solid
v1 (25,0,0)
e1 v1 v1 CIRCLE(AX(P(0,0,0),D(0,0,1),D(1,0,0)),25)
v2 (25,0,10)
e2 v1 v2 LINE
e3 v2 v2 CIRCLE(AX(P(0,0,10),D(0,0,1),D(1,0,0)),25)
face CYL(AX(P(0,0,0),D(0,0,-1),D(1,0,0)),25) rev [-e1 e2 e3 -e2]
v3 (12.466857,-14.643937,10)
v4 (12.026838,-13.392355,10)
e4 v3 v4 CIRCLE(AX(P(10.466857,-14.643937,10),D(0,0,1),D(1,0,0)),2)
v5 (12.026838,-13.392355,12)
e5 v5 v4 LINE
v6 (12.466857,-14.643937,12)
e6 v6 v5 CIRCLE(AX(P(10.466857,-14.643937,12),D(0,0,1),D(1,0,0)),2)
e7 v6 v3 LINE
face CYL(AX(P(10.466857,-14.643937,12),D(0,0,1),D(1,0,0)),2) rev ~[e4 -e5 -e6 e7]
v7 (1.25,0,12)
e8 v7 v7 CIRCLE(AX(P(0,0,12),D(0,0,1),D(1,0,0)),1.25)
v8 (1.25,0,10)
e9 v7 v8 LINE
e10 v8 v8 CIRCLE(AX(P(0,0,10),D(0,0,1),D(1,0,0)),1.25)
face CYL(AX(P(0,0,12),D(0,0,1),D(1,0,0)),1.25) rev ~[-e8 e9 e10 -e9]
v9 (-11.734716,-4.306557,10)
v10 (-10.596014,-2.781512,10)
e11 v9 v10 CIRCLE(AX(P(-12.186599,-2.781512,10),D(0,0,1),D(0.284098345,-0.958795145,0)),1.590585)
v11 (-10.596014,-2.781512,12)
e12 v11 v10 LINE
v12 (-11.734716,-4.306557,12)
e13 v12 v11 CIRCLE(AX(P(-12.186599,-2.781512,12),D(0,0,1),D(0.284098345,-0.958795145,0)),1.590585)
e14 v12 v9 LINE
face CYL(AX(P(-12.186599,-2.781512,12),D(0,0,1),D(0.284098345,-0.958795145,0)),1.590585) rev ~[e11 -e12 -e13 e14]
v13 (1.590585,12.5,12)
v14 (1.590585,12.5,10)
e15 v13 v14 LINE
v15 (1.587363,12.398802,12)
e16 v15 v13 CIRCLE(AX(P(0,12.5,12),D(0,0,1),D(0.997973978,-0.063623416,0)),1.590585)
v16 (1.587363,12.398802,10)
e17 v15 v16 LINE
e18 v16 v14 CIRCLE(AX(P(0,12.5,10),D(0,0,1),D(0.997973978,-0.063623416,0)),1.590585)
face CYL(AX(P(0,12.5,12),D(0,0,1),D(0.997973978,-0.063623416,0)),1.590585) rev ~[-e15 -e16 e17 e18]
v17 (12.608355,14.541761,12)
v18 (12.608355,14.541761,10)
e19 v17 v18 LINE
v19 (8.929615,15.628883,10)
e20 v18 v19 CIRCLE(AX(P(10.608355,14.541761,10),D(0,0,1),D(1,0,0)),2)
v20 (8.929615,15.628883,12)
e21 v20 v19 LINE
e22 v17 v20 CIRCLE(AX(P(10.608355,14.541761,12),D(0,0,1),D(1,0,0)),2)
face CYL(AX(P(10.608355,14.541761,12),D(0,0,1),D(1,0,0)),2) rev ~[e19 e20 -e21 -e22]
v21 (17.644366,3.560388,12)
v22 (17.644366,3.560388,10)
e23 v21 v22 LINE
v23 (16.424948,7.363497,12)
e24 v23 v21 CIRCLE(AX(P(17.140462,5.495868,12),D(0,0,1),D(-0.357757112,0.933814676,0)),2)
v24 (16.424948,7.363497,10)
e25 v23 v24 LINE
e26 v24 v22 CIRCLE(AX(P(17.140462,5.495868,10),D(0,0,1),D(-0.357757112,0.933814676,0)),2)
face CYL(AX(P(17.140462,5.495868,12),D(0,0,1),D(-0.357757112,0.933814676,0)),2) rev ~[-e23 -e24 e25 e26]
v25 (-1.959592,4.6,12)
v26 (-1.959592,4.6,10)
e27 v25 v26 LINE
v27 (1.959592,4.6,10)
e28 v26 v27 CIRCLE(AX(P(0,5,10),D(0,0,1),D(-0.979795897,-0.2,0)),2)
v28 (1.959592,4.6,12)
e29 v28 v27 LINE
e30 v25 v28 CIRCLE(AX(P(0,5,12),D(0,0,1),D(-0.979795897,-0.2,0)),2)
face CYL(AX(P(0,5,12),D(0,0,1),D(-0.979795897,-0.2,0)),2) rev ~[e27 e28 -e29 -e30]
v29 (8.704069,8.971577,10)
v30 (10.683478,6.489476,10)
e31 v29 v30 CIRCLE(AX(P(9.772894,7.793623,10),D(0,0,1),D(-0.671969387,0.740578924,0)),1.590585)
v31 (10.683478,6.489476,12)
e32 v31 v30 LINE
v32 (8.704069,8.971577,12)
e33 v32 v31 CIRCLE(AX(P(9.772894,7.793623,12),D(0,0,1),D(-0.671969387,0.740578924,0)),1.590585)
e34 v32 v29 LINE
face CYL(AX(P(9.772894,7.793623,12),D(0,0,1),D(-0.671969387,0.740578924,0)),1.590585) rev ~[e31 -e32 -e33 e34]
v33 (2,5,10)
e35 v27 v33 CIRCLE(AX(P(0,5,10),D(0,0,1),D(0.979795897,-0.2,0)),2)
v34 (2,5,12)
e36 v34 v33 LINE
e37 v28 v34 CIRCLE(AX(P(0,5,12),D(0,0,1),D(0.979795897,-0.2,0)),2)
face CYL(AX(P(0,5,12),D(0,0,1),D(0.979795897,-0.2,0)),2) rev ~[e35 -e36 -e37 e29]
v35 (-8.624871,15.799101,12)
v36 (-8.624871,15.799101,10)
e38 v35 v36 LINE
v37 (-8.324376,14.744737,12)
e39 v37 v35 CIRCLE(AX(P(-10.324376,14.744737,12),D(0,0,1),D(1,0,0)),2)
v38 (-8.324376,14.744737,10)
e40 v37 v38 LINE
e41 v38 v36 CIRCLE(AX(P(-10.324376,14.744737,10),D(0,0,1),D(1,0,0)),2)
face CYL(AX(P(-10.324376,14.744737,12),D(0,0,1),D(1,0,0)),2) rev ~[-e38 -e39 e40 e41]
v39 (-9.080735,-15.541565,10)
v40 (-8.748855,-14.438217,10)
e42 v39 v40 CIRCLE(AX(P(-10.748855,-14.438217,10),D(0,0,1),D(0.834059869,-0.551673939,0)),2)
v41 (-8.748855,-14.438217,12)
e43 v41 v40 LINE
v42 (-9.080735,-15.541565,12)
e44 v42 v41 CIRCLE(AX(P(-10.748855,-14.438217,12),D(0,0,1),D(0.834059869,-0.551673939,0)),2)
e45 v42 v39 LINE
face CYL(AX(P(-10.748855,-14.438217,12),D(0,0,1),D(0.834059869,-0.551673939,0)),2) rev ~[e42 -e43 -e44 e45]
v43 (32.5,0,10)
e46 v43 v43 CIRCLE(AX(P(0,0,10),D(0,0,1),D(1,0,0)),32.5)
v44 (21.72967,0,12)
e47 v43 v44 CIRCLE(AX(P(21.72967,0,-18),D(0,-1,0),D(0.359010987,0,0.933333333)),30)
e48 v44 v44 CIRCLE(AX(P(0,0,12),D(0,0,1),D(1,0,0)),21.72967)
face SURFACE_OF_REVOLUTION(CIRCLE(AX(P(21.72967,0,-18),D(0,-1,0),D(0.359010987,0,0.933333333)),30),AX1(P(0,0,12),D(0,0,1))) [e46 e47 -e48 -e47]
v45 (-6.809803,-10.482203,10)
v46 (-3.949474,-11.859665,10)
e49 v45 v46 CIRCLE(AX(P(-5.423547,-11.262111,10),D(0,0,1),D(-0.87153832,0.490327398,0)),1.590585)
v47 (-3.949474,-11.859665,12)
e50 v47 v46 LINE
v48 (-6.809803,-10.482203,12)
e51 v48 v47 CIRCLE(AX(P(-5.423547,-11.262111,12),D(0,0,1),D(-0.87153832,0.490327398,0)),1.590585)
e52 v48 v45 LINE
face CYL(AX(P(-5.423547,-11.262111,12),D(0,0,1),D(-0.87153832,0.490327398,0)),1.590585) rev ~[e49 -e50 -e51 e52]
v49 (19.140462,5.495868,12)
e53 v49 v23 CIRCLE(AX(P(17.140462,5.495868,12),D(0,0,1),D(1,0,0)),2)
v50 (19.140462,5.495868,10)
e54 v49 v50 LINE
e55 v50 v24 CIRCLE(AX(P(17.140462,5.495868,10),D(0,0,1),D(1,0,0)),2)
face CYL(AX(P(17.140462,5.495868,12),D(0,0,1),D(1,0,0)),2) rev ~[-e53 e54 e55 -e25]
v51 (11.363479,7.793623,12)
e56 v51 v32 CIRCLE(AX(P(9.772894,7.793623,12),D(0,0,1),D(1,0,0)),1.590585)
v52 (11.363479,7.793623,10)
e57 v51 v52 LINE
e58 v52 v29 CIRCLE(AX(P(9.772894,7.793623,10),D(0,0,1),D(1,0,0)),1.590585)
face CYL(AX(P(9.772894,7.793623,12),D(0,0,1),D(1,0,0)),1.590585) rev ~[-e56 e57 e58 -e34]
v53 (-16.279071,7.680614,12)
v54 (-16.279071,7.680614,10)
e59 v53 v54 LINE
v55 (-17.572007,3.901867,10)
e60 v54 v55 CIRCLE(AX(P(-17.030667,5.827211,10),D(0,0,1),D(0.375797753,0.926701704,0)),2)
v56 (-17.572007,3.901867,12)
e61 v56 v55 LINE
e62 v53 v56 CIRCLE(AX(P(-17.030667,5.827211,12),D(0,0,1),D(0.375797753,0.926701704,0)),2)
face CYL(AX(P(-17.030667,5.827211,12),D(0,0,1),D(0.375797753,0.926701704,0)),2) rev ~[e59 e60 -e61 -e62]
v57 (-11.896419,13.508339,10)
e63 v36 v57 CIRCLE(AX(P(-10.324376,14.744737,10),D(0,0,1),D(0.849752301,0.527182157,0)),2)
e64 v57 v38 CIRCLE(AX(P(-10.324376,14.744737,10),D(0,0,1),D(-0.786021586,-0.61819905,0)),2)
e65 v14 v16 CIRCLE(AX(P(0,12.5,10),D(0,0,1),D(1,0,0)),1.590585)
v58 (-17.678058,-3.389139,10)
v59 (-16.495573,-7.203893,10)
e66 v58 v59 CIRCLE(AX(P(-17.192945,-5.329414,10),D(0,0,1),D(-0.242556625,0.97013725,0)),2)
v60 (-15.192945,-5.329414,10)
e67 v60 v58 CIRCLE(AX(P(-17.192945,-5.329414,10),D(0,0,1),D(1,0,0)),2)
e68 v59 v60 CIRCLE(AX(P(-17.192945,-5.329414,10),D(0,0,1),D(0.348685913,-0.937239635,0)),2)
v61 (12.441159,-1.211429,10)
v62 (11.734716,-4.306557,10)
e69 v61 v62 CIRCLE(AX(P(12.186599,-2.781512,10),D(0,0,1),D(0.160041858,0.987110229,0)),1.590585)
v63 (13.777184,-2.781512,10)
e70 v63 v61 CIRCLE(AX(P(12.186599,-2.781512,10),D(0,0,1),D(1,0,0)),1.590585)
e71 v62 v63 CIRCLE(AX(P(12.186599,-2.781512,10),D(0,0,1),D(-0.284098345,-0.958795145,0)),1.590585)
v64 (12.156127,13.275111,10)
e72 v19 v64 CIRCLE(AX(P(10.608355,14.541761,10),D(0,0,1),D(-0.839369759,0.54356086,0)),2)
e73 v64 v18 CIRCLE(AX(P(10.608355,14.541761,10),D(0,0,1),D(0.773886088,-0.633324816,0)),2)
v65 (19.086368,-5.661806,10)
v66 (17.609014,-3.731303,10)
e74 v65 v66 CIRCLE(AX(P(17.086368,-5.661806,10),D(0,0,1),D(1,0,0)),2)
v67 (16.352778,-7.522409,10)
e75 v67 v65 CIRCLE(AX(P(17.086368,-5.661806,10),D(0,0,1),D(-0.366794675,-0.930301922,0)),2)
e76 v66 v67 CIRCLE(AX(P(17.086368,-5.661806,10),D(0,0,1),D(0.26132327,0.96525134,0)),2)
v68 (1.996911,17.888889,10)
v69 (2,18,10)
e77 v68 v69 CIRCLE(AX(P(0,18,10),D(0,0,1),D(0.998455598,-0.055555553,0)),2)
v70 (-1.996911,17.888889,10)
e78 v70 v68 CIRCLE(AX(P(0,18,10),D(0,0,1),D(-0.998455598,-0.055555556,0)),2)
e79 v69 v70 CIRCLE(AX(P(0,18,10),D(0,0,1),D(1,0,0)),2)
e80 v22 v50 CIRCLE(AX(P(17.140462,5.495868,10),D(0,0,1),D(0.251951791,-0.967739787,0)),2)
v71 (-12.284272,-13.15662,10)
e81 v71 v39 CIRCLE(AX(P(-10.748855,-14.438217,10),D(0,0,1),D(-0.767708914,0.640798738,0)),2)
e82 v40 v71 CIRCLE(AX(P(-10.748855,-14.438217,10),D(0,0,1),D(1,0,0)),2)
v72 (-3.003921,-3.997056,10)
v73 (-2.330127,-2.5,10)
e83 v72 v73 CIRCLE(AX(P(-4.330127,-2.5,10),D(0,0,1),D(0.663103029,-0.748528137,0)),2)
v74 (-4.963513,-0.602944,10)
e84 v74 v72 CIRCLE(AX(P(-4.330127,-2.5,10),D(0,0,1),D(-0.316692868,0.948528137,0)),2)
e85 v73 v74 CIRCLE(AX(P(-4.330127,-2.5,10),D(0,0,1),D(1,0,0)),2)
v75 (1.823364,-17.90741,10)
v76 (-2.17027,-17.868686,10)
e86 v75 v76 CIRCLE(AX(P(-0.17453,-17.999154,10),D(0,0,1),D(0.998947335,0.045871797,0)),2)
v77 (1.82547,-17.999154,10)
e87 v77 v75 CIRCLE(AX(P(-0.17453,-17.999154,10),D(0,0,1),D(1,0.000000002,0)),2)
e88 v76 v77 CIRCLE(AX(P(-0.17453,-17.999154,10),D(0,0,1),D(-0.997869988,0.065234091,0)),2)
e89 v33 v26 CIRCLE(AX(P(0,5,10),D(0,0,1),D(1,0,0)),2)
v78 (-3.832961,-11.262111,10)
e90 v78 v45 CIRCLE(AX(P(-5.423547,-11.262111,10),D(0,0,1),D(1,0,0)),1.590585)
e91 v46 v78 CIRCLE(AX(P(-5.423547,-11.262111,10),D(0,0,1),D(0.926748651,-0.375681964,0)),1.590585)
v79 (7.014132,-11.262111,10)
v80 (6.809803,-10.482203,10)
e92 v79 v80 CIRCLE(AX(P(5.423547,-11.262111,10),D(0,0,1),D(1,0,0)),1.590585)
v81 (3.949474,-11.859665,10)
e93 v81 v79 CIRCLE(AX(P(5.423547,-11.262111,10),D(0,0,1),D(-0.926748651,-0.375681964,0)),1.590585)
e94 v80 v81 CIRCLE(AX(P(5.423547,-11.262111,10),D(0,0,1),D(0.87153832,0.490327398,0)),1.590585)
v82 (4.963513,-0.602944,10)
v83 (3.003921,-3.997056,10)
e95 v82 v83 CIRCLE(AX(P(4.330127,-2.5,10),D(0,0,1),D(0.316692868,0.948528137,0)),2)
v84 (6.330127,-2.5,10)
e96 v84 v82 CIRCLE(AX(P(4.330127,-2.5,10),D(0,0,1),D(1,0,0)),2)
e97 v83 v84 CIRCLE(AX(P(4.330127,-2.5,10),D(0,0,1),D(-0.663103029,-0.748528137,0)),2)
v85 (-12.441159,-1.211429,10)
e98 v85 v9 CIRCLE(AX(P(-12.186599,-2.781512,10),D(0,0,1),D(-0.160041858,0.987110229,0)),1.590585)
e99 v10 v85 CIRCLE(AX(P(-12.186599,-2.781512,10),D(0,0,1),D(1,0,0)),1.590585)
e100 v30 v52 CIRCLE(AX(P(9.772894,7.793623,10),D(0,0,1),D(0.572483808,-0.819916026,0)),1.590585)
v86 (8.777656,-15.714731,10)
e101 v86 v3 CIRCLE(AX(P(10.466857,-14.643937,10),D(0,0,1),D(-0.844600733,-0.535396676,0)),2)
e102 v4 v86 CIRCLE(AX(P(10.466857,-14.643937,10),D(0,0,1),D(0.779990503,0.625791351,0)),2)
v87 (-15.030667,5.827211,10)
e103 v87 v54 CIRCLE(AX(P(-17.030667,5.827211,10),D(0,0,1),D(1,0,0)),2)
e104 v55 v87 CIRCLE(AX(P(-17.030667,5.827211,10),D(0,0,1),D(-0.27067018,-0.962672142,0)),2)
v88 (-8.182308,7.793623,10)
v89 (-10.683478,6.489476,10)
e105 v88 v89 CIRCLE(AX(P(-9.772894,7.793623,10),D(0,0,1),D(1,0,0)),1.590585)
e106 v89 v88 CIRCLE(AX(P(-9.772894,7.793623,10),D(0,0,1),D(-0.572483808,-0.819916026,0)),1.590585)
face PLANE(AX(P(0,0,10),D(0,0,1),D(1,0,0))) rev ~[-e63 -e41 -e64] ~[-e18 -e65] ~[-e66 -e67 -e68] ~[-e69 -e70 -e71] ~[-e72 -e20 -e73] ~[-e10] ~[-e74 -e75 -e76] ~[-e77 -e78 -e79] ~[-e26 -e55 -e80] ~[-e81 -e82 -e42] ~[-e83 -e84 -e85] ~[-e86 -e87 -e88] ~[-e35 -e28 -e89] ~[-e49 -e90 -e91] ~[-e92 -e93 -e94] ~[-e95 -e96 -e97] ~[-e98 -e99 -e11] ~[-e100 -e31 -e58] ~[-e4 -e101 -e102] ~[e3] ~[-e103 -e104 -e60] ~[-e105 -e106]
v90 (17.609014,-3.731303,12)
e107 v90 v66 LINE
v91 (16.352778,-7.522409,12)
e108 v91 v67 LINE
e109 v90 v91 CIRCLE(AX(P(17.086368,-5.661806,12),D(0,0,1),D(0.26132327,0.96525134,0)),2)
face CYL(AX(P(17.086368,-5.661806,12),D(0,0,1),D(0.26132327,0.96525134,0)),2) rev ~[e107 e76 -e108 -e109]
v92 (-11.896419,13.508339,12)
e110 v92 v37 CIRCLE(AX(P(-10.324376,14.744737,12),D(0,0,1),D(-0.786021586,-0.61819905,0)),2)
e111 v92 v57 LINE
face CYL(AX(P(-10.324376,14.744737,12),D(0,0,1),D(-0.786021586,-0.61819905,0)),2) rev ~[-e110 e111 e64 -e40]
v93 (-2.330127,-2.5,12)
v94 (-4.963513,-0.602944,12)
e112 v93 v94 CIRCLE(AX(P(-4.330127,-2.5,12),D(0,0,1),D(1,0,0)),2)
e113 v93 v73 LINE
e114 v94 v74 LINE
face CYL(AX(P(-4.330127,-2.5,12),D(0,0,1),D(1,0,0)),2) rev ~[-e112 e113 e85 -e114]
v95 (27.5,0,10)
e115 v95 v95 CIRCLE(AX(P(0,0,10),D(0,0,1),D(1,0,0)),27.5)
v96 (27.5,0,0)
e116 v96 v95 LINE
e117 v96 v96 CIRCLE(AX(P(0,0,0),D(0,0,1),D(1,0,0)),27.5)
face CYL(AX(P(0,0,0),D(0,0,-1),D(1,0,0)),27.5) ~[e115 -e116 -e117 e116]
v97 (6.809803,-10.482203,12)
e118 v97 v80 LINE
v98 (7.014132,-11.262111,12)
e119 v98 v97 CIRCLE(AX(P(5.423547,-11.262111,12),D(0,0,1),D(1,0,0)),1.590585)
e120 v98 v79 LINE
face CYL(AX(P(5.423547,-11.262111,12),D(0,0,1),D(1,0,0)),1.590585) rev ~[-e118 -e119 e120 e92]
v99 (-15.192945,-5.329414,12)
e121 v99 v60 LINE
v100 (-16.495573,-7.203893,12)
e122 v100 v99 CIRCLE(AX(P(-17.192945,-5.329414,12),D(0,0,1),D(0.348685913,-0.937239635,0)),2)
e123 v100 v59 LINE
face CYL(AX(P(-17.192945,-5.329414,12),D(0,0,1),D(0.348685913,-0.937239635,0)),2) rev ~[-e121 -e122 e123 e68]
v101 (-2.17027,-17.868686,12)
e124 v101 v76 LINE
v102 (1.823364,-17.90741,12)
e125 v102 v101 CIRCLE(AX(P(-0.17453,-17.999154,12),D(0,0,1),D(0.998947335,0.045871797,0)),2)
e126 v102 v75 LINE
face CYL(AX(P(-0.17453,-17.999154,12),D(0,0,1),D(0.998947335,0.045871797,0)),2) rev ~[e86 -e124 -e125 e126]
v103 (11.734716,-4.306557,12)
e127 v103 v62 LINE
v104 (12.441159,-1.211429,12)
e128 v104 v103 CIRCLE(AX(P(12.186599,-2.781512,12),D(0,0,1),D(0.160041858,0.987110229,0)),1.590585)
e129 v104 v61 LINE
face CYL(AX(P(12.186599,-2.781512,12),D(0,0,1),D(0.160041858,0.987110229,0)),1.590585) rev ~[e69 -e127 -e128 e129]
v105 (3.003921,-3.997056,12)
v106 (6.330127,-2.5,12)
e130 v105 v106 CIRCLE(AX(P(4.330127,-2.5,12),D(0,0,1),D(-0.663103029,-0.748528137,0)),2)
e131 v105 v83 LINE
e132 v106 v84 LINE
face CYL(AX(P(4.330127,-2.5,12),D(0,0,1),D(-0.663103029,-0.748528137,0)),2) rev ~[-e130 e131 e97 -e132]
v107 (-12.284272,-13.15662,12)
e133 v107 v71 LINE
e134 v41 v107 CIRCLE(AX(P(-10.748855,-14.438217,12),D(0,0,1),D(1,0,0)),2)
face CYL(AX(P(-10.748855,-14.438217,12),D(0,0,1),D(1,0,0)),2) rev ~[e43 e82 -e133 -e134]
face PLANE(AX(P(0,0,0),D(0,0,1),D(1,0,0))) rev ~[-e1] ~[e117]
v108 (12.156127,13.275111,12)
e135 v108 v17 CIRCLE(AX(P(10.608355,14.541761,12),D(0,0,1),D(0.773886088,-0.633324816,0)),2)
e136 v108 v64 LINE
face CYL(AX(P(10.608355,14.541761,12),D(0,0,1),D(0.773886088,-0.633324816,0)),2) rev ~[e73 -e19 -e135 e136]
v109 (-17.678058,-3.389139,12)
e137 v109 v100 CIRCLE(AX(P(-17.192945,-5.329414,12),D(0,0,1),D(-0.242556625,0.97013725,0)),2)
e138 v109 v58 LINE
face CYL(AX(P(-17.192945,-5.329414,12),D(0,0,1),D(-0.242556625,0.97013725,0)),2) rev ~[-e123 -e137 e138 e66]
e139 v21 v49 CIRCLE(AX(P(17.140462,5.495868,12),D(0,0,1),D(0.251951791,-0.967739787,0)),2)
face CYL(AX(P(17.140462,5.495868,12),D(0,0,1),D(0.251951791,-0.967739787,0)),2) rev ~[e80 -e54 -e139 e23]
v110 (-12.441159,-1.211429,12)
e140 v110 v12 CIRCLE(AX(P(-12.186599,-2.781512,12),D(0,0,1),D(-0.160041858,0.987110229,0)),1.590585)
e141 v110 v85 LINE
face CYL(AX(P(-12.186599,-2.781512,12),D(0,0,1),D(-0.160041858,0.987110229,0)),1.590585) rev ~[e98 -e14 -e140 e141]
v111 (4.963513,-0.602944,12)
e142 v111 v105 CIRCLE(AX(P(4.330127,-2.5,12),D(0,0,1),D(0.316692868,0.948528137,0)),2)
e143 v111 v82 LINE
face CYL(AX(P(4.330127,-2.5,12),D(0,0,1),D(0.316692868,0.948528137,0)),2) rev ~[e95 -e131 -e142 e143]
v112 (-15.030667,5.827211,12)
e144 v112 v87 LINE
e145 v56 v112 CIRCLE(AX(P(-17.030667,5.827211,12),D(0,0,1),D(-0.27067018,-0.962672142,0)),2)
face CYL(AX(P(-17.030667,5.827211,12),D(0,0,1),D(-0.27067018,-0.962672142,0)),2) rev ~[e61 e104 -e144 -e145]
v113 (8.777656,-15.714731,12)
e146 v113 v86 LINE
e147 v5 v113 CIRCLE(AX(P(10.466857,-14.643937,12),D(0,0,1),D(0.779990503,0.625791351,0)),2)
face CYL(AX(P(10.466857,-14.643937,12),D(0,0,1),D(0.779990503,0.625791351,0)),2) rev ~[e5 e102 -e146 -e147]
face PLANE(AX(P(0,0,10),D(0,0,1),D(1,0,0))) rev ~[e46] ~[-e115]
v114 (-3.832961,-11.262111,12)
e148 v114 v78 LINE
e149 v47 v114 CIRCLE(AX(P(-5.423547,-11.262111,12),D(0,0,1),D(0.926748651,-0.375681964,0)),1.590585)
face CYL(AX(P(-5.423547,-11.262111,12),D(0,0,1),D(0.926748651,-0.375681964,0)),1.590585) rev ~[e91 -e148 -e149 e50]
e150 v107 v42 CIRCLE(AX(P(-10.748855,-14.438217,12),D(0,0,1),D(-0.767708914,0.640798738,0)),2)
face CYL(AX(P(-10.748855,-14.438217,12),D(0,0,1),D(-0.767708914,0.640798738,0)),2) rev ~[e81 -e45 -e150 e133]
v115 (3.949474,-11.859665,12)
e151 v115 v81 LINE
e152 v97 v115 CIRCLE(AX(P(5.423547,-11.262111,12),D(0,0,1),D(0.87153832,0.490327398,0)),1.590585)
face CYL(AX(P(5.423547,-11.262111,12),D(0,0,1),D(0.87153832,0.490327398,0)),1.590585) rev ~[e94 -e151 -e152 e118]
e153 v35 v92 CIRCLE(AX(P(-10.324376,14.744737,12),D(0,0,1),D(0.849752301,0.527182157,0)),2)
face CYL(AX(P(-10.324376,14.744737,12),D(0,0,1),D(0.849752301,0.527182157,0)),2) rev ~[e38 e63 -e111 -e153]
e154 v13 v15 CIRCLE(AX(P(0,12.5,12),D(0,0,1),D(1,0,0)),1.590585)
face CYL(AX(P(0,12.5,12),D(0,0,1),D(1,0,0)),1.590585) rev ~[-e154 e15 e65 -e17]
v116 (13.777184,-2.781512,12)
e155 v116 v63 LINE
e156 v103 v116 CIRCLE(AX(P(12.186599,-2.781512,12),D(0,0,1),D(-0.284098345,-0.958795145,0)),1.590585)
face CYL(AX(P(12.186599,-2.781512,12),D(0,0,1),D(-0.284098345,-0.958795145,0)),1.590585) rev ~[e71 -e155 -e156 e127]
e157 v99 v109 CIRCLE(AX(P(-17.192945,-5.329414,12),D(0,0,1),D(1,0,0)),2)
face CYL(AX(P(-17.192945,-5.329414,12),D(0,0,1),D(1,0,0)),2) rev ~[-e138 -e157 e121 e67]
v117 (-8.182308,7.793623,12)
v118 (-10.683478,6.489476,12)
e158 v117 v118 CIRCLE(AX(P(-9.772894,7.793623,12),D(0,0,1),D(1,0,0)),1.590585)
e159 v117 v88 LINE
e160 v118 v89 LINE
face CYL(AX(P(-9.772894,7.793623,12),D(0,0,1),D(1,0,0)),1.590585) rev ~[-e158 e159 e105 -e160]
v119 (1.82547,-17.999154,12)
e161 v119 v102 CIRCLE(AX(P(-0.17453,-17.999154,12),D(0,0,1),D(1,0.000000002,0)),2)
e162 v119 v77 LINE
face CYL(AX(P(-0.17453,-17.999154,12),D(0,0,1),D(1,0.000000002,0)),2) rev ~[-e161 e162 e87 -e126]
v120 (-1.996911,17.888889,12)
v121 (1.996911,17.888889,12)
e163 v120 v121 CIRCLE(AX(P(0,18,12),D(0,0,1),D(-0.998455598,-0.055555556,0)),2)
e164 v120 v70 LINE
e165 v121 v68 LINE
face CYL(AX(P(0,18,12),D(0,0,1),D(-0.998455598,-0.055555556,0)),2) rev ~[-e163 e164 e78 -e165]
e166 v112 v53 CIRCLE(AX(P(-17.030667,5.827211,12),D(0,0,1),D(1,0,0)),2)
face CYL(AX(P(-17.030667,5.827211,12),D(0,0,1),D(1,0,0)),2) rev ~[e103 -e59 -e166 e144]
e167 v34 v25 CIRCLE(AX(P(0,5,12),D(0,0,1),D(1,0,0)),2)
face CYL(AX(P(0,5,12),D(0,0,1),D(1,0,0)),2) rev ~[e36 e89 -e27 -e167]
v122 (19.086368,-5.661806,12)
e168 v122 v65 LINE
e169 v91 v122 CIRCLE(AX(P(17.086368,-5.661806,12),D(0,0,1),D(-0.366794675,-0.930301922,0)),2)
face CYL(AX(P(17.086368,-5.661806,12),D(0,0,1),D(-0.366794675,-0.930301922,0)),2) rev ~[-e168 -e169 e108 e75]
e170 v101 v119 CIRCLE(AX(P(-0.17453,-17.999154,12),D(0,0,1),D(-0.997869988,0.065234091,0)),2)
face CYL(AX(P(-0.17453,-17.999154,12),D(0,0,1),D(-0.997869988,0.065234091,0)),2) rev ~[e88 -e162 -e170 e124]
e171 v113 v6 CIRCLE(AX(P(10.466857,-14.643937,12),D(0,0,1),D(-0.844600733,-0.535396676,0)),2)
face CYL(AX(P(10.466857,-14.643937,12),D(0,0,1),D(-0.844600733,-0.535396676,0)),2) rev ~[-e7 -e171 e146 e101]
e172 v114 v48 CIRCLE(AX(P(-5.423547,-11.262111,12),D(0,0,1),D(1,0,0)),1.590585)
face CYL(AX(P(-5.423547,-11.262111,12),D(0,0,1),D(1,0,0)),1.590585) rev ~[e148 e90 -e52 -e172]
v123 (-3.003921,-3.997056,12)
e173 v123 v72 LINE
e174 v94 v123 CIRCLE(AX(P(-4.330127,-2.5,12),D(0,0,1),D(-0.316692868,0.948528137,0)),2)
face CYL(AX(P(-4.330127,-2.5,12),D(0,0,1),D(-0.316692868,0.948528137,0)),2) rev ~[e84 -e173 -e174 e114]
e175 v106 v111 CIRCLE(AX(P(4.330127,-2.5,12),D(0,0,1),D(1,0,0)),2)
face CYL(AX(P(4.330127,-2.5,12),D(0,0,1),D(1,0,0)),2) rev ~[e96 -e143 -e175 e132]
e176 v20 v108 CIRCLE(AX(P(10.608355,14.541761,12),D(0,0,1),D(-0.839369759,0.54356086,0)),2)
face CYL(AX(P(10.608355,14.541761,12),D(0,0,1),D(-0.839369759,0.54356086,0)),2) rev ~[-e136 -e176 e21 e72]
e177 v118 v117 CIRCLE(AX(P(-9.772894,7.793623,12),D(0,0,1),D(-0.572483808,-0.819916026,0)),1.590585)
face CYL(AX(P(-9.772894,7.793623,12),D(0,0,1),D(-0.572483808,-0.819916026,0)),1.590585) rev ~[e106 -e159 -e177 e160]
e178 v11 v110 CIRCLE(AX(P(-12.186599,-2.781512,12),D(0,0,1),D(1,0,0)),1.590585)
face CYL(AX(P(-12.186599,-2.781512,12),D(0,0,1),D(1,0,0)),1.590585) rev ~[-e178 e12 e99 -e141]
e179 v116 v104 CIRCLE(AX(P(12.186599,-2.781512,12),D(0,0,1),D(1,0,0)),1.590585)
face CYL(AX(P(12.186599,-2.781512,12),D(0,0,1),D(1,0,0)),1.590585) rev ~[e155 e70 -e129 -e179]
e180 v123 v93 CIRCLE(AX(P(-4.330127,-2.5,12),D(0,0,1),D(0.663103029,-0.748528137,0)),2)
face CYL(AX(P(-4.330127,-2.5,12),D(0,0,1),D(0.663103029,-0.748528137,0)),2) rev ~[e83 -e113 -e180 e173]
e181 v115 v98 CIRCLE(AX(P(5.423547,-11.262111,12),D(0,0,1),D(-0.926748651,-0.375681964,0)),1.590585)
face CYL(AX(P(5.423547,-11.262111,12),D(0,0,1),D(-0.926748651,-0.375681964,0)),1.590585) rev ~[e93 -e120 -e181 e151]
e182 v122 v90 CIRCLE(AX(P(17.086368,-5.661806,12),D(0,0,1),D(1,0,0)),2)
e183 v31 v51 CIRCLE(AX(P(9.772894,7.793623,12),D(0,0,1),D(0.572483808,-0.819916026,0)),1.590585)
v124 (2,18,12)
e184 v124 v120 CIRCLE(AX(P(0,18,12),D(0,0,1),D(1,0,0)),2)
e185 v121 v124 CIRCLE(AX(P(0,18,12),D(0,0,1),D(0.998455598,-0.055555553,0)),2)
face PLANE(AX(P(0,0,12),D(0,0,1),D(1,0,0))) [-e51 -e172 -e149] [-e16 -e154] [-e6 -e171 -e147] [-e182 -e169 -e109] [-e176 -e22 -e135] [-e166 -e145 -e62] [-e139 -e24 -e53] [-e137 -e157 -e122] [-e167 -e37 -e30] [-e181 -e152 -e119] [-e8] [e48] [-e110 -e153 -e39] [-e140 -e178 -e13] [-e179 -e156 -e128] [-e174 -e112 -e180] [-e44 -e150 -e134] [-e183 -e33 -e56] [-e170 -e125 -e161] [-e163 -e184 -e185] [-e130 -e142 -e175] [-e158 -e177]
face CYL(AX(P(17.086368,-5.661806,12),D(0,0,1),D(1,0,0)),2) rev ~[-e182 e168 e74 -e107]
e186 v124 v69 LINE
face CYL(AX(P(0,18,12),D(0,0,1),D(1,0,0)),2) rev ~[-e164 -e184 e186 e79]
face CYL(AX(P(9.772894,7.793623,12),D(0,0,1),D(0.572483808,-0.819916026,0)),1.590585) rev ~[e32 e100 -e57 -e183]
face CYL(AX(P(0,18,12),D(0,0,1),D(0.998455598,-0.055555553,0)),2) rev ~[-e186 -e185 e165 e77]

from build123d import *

# Parameters (mm, degrees)
F0_R     = 27.5
F0_R_2   = 25
F1_DEPTH = 10
F2_R     = 32.5
F3_DEPTH = 2
F5_R     = 1.25
F6_DEPTH = 25


# Not quite as in the source:
# - a fillet or chamfer that OpenCascade refuses, or shapes differently, is made with other operations: its cross-section is extruded or revolved along the edge and cut away or added


with BuildPart() as f1:
    # F0 (on Top) → F1 (new body)
    with BuildSketch(Plane.XY):
        Circle(F0_R)
        Circle(F0_R_2, mode=Mode.SUBTRACT)
    extrude(amount=F1_DEPTH)

    # F2 (on face) → F3 (join)
    with BuildSketch(Plane.XY.offset(10)):
        Circle(F2_R)
    extrude(amount=F3_DEPTH)

    # F4: fillet of radius 30 on 1 edges, made by hand

    # F4_s1 → F4_t2 (revolve, cut)
    with BuildSketch(Plane.XZ):
        with BuildLine():
            ThreePointArc((32.5, 10), (27.2068959608, 11.4957624075), (21.7296703857, 12))
            Line((21.7296703857, 12), (32.5, 12))
            Line((32.5, 12), (32.5, 10))
        make_face()
    revolve(axis=Axis((0, 0, 12), (0, 0, 1)), mode=Mode.SUBTRACT)

    # F5 (on face) → F6 (cut)
    with BuildSketch(Plane.XY.offset(12)):
        Circle(F5_R)
        with BuildLine():
            ThreePointArc((16.4249477126, 7.3634973104), (15.2359661654, 4.8852159631), (17.6443655184, 3.5603883849))
            ThreePointArc((17.6443655184, 3.5603883849), (17.1404619361, 5.4958679585), (16.4249477126, 7.3634973104))
        make_face()
        with BuildLine():
            ThreePointArc((16.4249477126, 7.3634973104), (17.1404619361, 5.4958679585), (17.6443655184, 3.5603883849))
            ThreePointArc((17.6443655184, 3.5603883849), (18.7228347058, 4.2727177561), (19.1404619361, 5.4958679585))
            ThreePointArc((19.1404619361, 5.4958679585), (18.273813504, 7.1437496968), (16.4249477126, 7.3634973104))
        make_face()
        with BuildLine():
            ThreePointArc((19.0863675843, -5.6618056107), (18.674651734, -4.4463413126), (17.6090141244, -3.7313029316))
            ThreePointArc((17.6090141244, -3.7313029316), (17.0863675843, -5.6618056107), (16.3527782346, -7.5224094552))
            ThreePointArc((16.3527782346, -7.5224094552), (18.211716708, -7.3151626048), (19.0863675843, -5.6618056107))
        make_face()
        with BuildLine():
            ThreePointArc((16.3527782346, -7.5224094552), (17.0863675843, -5.6618056107), (17.6090141244, -3.7313029316))
            ThreePointArc((17.6090141244, -3.7313029316), (15.1878822972, -5.0327160984), (16.3527782346, -7.5224094552))
        make_face()
        with BuildLine():
            ThreePointArc((8.9296151321, 15.6288826725), (9.4296485775, 12.9260097364), (12.1561268259, 13.2751113213))
            ThreePointArc((12.1561268259, 13.2751113213), (10.6083546497, 14.5417609534), (8.9296151321, 15.6288826725))
        make_face()
        with BuildLine():
            ThreePointArc((8.9296151321, 15.6288826725), (10.6083546497, 14.5417609534), (12.1561268259, 13.2751113213))
            ThreePointArc((12.1561268259, 13.2751113213), (12.491907722, 13.8692820885), (12.6083546497, 14.5417609534))
            ThreePointArc((12.6083546497, 14.5417609534), (11.1751530993, 16.4597649987), (8.9296151321, 15.6288826725))
        make_face()
        with BuildLine():
            ThreePointArc((12.4668572832, -14.6439372647), (12.3536484764, -13.9805979901), (12.0268382899, -13.3923545633))
            ThreePointArc((12.0268382899, -13.3923545633), (10.4668572832, -14.6439372647), (8.7776558162, -15.7147306173))
            ThreePointArc((8.7776558162, -15.7147306173), (11.024350362, -16.5646666749), (12.4668572832, -14.6439372647))
        make_face()
        with BuildLine():
            ThreePointArc((8.7776558162, -15.7147306173), (10.4668572832, -14.6439372647), (12.0268382899, -13.3923545633))
            ThreePointArc((12.0268382899, -13.3923545633), (9.3038731406, -13.0168331242), (8.7776558162, -15.7147306173))
        make_face()
        with BuildLine():
            ThreePointArc((-1.9969111951, 17.8888888889), (0, 16), (1.9969111951, 17.8888888889))
            ThreePointArc((1.9969111951, 17.8888888889), (0, 18), (-1.9969111951, 17.8888888889))
        make_face()
        with BuildLine():
            ThreePointArc((-1.9969111951, 17.8888888889), (0, 18), (1.9969111951, 17.8888888889))
            ThreePointArc((1.9969111951, 17.8888888889), (1.9992276496, 17.944422982), (2, 18))
            ThreePointArc((2, 18), (-0.055577018, 19.9992276496), (-1.9969111951, 17.8888888889))
        make_face()
        with BuildLine():
            ThreePointArc((1.8254698097, -17.9991538471), (1.8249434079, -17.9532699735), (1.8233644798, -17.9074102531))
            ThreePointArc((1.8233644798, -17.9074102531), (-0.1745301903, -17.9991538471), (-2.1702701668, -17.8686856652))
            ThreePointArc((-2.1702701668, -17.8686856652), (-0.2397990464, -19.9980885575), (1.8254698097, -17.9991538471))
        make_face()
        with BuildLine():
            ThreePointArc((-2.1702701668, -17.8686856652), (-0.1745301903, -17.9991538471), (1.8233644798, -17.9074102531))
            ThreePointArc((1.8233644798, -17.9074102531), (-0.155137947, -15.9992478641), (-2.1702701668, -17.8686856652))
        make_face()
        with BuildLine():
            ThreePointArc((-8.3243758543, 14.7447367972), (-8.4009662248, 15.2929114018), (-8.6248712515, 15.7991011104))
            ThreePointArc((-8.6248712515, 15.7991011104), (-10.3243758543, 14.7447367972), (-11.8964190269, 13.5083386964))
            ThreePointArc((-11.8964190269, 13.5083386964), (-9.6701917614, 12.854751831), (-8.3243758543, 14.7447367972))
        make_face()
        with BuildLine():
            ThreePointArc((-11.8964190269, 13.5083386964), (-10.3243758543, 14.7447367972), (-8.6248712515, 15.7991011104))
            ThreePointArc((-8.6248712515, 15.7991011104), (-11.471528727, 16.3830408858), (-11.8964190269, 13.5083386964))
        make_face()
        with BuildLine():
            ThreePointArc((-12.2842724795, -13.1566199934), (-11.9431718341, -16.0424638551), (-9.0807349126, -15.5415653474))
            ThreePointArc((-9.0807349126, -15.5415653474), (-10.7488546507, -14.4382174696), (-12.2842724795, -13.1566199934))
        make_face()
        with BuildLine():
            ThreePointArc((-12.2842724795, -13.1566199934), (-10.7488546507, -14.4382174696), (-9.0807349126, -15.5415653474))
            ThreePointArc((-9.0807349126, -15.5415653474), (-8.8336210518, -15.0143079676), (-8.7488546507, -14.4382174696))
            ThreePointArc((-8.7488546507, -14.4382174696), (-10.0672520016, -12.5579467899), (-12.2842724795, -13.1566199934))
        make_face()
        with BuildLine():
            ThreePointArc((-15.0306668238, 5.827210957), (-15.3718734352, 6.9445311859), (-16.2790713177, 7.6806143657))
            ThreePointArc((-16.2790713177, 7.6806143657), (-17.0306668238, 5.827210957), (-17.5720071839, 3.9018666724))
            ThreePointArc((-17.5720071839, 3.9018666724), (-15.8229169987, 4.2330527591), (-15.0306668238, 5.827210957))
        make_face()
        with BuildLine():
            ThreePointArc((-17.5720071839, 3.9018666724), (-17.0306668238, 5.827210957), (-16.2790713177, 7.6806143657))
            ThreePointArc((-16.2790713177, 7.6806143657), (-18.9229631375, 6.4746788412), (-17.5720071839, 3.9018666724))
        make_face()
        with BuildLine():
            ThreePointArc((-17.6780580424, -3.3891391013), (-19.1032719926, -5.9215706682), (-16.4955729665, -7.2038928718))
            ThreePointArc((-16.4955729665, -7.2038928718), (-17.1929447933, -5.3294136014), (-17.6780580424, -3.3891391013))
        make_face()
        with BuildLine():
            ThreePointArc((-17.6780580424, -3.3891391013), (-17.1929447933, -5.3294136014), (-16.4955729665, -7.2038928718))
            ThreePointArc((-16.4955729665, -7.2038928718), (-15.5505770431, -6.4707409747), (-15.1929447933, -5.3294136014))
            ThreePointArc((-15.1929447933, -5.3294136014), (-15.962137436, -3.7529894043), (-17.6780580424, -3.3891391013))
        make_face()
        with BuildLine():
            ThreePointArc((8.7040688402, 8.9715765407), (8.5293237964, 6.8019087528), (10.6834779133, 6.4894760709))
            ThreePointArc((10.6834779134, 6.4894760709), (9.7728935309, 7.7936225232), (8.7040688402, 8.9715765407))
        make_face()
        with BuildLine():
            ThreePointArc((8.7040688402, 8.9715765407), (9.7728935309, 7.7936225232), (10.6834779134, 6.4894760709))
            ThreePointArc((10.6834779133, 6.4894760709), (11.1832700946, 7.0582315828), (11.3634789221, 7.7936225232))
            ThreePointArc((11.3634789221, 7.7936225232), (10.4170615788, 9.2479297166), (8.7040688402, 8.9715765407))
        make_face()
        with BuildLine():
            ThreePointArc((13.7771842935, -2.7815116745), (13.3979745021, -1.7507202101), (12.4411591434, -1.2114285651))
            ThreePointArc((12.4411591434, -1.2114285651), (12.1865989023, -2.7815116745), (11.7347162243, -4.3065572253))
            ThreePointArc((11.7347162243, -4.3065572253), (13.1382301073, -4.0560154745), (13.7771842935, -2.7815116745))
        make_face()
        with BuildLine():
            ThreePointArc((11.7347162243, -4.3065572253), (12.1865989023, -2.7815116745), (12.4411591434, -1.2114285651))
            ThreePointArc((12.4411591434, -1.2114285651), (10.6358928077, -2.4275731277), (11.7347162243, -4.3065572253))
        make_face()
        with BuildLine():
            ThreePointArc((-1.5873628304, 12.3988015245), (0, 10.9094146088), (1.5873628304, 12.3988015245))
            ThreePointArc((1.5873628304, 12.3988015245), (0, 12.5), (-1.5873628304, 12.3988015245))
        make_face()
        with BuildLine():
            ThreePointArc((-1.5873628304, 12.3988015245), (0, 12.5), (1.5873628304, 12.3988015245))
            ThreePointArc((1.5873628304, 12.3988015245), (1.5897795469, 12.449375114), (1.5905853912, 12.5))
            ThreePointArc((1.5905853912, 12.5), (-0.050624886, 14.0897795469), (-1.5873628304, 12.3988015245))
        make_face()
        with BuildLine():
            ThreePointArc((7.0141321302, -11.2621108488), (6.9622020965, -10.8589960048), (6.8098028583, -10.4822032527))
            ThreePointArc((6.8098028583, -10.4822032527), (5.423546739, -11.2621108488), (3.9494738738, -11.8596650931))
            ThreePointArc((3.9494738738, -11.8596650931), (5.7279503541, -12.8232964002), (7.0141321302, -11.2621108488))
        make_face()
        with BuildLine():
            ThreePointArc((3.9494738738, -11.8596650931), (5.423546739, -11.2621108488), (6.8098028583, -10.4822032527))
            ThreePointArc((6.8098028583, -10.4822032527), (4.733417602, -9.8290429296), (3.9494738738, -11.8596650931))
        make_face()
        with BuildLine():
            ThreePointArc((-8.1823081396, 7.7936225232), (-8.3185863375, 8.4377905712), (-8.7040688402, 8.9715765407))
            ThreePointArc((-8.7040688402, 8.9715765407), (-9.7728935309, 7.7936225232), (-10.6834779134, 6.4894760709))
            ThreePointArc((-10.6834779133, 6.4894760709), (-9.0375025904, 6.3832459595), (-8.1823081396, 7.7936225232))
        make_face()
        with BuildLine():
            ThreePointArc((-10.6834779134, 6.4894760709), (-9.7728935309, 7.7936225232), (-8.7040688402, 8.9715765407))
            ThreePointArc((-8.7040688402, 8.9715765407), (-11.0164632653, 8.7853362936), (-10.6834779133, 6.4894760709))
        make_face()
        with BuildLine():
            ThreePointArc((-6.8098028583, -10.4822032527), (-6.1136758759, -12.695178768), (-3.9494738738, -11.8596650931))
            ThreePointArc((-3.9494738738, -11.8596650931), (-5.423546739, -11.2621108488), (-6.8098028583, -10.4822032527))
        make_face()
        with BuildLine():
            ThreePointArc((-6.8098028583, -10.4822032527), (-5.423546739, -11.2621108488), (-3.9494738738, -11.8596650931))
            ThreePointArc((-3.9494738738, -11.8596650931), (-3.8623611876, -11.5665144639), (-3.8329613478, -11.2621108488))
            ThreePointArc((-3.8329613478, -11.2621108488), (-5.020431895, -9.7234554912), (-6.8098028583, -10.4822032527))
        make_face()
        with BuildLine():
            ThreePointArc((-10.5960135111, -2.7815116745), (-11.1558074379, -1.5701360747), (-12.4411591434, -1.2114285651))
            ThreePointArc((-12.4411591434, -1.2114285651), (-12.1865989023, -2.7815116745), (-11.7347162243, -4.3065572253))
            ThreePointArc((-11.7347162243, -4.3065572253), (-10.9120951022, -3.7331428795), (-10.5960135111, -2.7815116745))
        make_face()
        with BuildLine():
            ThreePointArc((-11.7347162243, -4.3065572253), (-12.1865989023, -2.7815116745), (-12.4411591434, -1.2114285651))
            ThreePointArc((-12.4411591434, -1.2114285651), (-13.7373049969, -3.1354502212), (-11.7347162243, -4.3065572253))
        make_face()
        with BuildLine():
            ThreePointArc((-1.9595917942, 4.6), (0, 3), (1.9595917942, 4.6))
            ThreePointArc((1.9595917942, 4.6), (0, 5), (-1.9595917942, 4.6))
        make_face()
        with BuildLine():
            ThreePointArc((-1.9595917942, 4.6), (0, 5), (1.9595917942, 4.6))
            ThreePointArc((1.9595917942, 4.6), (1.989872306, 4.798982076), (2, 5))
            ThreePointArc((2, 5), (-0.201017924, 6.989872306), (-1.9595917942, 4.6))
        make_face()
        with BuildLine():
            ThreePointArc((6.3301270189, -2.5), (5.9528980242, -1.3309772182), (4.9635127545, -0.6029437252))
            ThreePointArc((4.9635127545, -0.6029437252), (4.3301270189, -2.5), (3.0039209603, -3.9970562748))
            ThreePointArc((3.0039209603, -3.9970562748), (5.1509765431, -4.3237889293), (6.3301270189, -2.5))
        make_face()
        with BuildLine():
            ThreePointArc((3.0039209603, -3.9970562748), (4.3301270189, -2.5), (4.9635127545, -0.6029437252))
            ThreePointArc((4.9635127545, -0.6029437252), (2.5980762114, -1.5), (3.0039209603, -3.9970562748))
        make_face()
        with BuildLine():
            ThreePointArc((-2.3301270189, -2.5), (-3.1611042371, -0.8772289947), (-4.9635127545, -0.6029437252))
            ThreePointArc((-4.9635127545, -0.6029437252), (-4.3301270189, -2.5), (-3.0039209603, -3.9970562748))
            ThreePointArc((-3.0039209603, -3.9970562748), (-2.5063380896, -3.3208495242), (-2.3301270189, -2.5))
        make_face()
        with BuildLine():
            ThreePointArc((-3.0039209603, -3.9970562748), (-4.3301270189, -2.5), (-4.9635127545, -0.6029437252))
            ThreePointArc((-4.9635127545, -0.6029437252), (-6.0621778265, -3.5), (-3.0039209603, -3.9970562748))
        make_face()
    extrude(amount=-F6_DEPTH, mode=Mode.SUBTRACT)


solid = f1.part
